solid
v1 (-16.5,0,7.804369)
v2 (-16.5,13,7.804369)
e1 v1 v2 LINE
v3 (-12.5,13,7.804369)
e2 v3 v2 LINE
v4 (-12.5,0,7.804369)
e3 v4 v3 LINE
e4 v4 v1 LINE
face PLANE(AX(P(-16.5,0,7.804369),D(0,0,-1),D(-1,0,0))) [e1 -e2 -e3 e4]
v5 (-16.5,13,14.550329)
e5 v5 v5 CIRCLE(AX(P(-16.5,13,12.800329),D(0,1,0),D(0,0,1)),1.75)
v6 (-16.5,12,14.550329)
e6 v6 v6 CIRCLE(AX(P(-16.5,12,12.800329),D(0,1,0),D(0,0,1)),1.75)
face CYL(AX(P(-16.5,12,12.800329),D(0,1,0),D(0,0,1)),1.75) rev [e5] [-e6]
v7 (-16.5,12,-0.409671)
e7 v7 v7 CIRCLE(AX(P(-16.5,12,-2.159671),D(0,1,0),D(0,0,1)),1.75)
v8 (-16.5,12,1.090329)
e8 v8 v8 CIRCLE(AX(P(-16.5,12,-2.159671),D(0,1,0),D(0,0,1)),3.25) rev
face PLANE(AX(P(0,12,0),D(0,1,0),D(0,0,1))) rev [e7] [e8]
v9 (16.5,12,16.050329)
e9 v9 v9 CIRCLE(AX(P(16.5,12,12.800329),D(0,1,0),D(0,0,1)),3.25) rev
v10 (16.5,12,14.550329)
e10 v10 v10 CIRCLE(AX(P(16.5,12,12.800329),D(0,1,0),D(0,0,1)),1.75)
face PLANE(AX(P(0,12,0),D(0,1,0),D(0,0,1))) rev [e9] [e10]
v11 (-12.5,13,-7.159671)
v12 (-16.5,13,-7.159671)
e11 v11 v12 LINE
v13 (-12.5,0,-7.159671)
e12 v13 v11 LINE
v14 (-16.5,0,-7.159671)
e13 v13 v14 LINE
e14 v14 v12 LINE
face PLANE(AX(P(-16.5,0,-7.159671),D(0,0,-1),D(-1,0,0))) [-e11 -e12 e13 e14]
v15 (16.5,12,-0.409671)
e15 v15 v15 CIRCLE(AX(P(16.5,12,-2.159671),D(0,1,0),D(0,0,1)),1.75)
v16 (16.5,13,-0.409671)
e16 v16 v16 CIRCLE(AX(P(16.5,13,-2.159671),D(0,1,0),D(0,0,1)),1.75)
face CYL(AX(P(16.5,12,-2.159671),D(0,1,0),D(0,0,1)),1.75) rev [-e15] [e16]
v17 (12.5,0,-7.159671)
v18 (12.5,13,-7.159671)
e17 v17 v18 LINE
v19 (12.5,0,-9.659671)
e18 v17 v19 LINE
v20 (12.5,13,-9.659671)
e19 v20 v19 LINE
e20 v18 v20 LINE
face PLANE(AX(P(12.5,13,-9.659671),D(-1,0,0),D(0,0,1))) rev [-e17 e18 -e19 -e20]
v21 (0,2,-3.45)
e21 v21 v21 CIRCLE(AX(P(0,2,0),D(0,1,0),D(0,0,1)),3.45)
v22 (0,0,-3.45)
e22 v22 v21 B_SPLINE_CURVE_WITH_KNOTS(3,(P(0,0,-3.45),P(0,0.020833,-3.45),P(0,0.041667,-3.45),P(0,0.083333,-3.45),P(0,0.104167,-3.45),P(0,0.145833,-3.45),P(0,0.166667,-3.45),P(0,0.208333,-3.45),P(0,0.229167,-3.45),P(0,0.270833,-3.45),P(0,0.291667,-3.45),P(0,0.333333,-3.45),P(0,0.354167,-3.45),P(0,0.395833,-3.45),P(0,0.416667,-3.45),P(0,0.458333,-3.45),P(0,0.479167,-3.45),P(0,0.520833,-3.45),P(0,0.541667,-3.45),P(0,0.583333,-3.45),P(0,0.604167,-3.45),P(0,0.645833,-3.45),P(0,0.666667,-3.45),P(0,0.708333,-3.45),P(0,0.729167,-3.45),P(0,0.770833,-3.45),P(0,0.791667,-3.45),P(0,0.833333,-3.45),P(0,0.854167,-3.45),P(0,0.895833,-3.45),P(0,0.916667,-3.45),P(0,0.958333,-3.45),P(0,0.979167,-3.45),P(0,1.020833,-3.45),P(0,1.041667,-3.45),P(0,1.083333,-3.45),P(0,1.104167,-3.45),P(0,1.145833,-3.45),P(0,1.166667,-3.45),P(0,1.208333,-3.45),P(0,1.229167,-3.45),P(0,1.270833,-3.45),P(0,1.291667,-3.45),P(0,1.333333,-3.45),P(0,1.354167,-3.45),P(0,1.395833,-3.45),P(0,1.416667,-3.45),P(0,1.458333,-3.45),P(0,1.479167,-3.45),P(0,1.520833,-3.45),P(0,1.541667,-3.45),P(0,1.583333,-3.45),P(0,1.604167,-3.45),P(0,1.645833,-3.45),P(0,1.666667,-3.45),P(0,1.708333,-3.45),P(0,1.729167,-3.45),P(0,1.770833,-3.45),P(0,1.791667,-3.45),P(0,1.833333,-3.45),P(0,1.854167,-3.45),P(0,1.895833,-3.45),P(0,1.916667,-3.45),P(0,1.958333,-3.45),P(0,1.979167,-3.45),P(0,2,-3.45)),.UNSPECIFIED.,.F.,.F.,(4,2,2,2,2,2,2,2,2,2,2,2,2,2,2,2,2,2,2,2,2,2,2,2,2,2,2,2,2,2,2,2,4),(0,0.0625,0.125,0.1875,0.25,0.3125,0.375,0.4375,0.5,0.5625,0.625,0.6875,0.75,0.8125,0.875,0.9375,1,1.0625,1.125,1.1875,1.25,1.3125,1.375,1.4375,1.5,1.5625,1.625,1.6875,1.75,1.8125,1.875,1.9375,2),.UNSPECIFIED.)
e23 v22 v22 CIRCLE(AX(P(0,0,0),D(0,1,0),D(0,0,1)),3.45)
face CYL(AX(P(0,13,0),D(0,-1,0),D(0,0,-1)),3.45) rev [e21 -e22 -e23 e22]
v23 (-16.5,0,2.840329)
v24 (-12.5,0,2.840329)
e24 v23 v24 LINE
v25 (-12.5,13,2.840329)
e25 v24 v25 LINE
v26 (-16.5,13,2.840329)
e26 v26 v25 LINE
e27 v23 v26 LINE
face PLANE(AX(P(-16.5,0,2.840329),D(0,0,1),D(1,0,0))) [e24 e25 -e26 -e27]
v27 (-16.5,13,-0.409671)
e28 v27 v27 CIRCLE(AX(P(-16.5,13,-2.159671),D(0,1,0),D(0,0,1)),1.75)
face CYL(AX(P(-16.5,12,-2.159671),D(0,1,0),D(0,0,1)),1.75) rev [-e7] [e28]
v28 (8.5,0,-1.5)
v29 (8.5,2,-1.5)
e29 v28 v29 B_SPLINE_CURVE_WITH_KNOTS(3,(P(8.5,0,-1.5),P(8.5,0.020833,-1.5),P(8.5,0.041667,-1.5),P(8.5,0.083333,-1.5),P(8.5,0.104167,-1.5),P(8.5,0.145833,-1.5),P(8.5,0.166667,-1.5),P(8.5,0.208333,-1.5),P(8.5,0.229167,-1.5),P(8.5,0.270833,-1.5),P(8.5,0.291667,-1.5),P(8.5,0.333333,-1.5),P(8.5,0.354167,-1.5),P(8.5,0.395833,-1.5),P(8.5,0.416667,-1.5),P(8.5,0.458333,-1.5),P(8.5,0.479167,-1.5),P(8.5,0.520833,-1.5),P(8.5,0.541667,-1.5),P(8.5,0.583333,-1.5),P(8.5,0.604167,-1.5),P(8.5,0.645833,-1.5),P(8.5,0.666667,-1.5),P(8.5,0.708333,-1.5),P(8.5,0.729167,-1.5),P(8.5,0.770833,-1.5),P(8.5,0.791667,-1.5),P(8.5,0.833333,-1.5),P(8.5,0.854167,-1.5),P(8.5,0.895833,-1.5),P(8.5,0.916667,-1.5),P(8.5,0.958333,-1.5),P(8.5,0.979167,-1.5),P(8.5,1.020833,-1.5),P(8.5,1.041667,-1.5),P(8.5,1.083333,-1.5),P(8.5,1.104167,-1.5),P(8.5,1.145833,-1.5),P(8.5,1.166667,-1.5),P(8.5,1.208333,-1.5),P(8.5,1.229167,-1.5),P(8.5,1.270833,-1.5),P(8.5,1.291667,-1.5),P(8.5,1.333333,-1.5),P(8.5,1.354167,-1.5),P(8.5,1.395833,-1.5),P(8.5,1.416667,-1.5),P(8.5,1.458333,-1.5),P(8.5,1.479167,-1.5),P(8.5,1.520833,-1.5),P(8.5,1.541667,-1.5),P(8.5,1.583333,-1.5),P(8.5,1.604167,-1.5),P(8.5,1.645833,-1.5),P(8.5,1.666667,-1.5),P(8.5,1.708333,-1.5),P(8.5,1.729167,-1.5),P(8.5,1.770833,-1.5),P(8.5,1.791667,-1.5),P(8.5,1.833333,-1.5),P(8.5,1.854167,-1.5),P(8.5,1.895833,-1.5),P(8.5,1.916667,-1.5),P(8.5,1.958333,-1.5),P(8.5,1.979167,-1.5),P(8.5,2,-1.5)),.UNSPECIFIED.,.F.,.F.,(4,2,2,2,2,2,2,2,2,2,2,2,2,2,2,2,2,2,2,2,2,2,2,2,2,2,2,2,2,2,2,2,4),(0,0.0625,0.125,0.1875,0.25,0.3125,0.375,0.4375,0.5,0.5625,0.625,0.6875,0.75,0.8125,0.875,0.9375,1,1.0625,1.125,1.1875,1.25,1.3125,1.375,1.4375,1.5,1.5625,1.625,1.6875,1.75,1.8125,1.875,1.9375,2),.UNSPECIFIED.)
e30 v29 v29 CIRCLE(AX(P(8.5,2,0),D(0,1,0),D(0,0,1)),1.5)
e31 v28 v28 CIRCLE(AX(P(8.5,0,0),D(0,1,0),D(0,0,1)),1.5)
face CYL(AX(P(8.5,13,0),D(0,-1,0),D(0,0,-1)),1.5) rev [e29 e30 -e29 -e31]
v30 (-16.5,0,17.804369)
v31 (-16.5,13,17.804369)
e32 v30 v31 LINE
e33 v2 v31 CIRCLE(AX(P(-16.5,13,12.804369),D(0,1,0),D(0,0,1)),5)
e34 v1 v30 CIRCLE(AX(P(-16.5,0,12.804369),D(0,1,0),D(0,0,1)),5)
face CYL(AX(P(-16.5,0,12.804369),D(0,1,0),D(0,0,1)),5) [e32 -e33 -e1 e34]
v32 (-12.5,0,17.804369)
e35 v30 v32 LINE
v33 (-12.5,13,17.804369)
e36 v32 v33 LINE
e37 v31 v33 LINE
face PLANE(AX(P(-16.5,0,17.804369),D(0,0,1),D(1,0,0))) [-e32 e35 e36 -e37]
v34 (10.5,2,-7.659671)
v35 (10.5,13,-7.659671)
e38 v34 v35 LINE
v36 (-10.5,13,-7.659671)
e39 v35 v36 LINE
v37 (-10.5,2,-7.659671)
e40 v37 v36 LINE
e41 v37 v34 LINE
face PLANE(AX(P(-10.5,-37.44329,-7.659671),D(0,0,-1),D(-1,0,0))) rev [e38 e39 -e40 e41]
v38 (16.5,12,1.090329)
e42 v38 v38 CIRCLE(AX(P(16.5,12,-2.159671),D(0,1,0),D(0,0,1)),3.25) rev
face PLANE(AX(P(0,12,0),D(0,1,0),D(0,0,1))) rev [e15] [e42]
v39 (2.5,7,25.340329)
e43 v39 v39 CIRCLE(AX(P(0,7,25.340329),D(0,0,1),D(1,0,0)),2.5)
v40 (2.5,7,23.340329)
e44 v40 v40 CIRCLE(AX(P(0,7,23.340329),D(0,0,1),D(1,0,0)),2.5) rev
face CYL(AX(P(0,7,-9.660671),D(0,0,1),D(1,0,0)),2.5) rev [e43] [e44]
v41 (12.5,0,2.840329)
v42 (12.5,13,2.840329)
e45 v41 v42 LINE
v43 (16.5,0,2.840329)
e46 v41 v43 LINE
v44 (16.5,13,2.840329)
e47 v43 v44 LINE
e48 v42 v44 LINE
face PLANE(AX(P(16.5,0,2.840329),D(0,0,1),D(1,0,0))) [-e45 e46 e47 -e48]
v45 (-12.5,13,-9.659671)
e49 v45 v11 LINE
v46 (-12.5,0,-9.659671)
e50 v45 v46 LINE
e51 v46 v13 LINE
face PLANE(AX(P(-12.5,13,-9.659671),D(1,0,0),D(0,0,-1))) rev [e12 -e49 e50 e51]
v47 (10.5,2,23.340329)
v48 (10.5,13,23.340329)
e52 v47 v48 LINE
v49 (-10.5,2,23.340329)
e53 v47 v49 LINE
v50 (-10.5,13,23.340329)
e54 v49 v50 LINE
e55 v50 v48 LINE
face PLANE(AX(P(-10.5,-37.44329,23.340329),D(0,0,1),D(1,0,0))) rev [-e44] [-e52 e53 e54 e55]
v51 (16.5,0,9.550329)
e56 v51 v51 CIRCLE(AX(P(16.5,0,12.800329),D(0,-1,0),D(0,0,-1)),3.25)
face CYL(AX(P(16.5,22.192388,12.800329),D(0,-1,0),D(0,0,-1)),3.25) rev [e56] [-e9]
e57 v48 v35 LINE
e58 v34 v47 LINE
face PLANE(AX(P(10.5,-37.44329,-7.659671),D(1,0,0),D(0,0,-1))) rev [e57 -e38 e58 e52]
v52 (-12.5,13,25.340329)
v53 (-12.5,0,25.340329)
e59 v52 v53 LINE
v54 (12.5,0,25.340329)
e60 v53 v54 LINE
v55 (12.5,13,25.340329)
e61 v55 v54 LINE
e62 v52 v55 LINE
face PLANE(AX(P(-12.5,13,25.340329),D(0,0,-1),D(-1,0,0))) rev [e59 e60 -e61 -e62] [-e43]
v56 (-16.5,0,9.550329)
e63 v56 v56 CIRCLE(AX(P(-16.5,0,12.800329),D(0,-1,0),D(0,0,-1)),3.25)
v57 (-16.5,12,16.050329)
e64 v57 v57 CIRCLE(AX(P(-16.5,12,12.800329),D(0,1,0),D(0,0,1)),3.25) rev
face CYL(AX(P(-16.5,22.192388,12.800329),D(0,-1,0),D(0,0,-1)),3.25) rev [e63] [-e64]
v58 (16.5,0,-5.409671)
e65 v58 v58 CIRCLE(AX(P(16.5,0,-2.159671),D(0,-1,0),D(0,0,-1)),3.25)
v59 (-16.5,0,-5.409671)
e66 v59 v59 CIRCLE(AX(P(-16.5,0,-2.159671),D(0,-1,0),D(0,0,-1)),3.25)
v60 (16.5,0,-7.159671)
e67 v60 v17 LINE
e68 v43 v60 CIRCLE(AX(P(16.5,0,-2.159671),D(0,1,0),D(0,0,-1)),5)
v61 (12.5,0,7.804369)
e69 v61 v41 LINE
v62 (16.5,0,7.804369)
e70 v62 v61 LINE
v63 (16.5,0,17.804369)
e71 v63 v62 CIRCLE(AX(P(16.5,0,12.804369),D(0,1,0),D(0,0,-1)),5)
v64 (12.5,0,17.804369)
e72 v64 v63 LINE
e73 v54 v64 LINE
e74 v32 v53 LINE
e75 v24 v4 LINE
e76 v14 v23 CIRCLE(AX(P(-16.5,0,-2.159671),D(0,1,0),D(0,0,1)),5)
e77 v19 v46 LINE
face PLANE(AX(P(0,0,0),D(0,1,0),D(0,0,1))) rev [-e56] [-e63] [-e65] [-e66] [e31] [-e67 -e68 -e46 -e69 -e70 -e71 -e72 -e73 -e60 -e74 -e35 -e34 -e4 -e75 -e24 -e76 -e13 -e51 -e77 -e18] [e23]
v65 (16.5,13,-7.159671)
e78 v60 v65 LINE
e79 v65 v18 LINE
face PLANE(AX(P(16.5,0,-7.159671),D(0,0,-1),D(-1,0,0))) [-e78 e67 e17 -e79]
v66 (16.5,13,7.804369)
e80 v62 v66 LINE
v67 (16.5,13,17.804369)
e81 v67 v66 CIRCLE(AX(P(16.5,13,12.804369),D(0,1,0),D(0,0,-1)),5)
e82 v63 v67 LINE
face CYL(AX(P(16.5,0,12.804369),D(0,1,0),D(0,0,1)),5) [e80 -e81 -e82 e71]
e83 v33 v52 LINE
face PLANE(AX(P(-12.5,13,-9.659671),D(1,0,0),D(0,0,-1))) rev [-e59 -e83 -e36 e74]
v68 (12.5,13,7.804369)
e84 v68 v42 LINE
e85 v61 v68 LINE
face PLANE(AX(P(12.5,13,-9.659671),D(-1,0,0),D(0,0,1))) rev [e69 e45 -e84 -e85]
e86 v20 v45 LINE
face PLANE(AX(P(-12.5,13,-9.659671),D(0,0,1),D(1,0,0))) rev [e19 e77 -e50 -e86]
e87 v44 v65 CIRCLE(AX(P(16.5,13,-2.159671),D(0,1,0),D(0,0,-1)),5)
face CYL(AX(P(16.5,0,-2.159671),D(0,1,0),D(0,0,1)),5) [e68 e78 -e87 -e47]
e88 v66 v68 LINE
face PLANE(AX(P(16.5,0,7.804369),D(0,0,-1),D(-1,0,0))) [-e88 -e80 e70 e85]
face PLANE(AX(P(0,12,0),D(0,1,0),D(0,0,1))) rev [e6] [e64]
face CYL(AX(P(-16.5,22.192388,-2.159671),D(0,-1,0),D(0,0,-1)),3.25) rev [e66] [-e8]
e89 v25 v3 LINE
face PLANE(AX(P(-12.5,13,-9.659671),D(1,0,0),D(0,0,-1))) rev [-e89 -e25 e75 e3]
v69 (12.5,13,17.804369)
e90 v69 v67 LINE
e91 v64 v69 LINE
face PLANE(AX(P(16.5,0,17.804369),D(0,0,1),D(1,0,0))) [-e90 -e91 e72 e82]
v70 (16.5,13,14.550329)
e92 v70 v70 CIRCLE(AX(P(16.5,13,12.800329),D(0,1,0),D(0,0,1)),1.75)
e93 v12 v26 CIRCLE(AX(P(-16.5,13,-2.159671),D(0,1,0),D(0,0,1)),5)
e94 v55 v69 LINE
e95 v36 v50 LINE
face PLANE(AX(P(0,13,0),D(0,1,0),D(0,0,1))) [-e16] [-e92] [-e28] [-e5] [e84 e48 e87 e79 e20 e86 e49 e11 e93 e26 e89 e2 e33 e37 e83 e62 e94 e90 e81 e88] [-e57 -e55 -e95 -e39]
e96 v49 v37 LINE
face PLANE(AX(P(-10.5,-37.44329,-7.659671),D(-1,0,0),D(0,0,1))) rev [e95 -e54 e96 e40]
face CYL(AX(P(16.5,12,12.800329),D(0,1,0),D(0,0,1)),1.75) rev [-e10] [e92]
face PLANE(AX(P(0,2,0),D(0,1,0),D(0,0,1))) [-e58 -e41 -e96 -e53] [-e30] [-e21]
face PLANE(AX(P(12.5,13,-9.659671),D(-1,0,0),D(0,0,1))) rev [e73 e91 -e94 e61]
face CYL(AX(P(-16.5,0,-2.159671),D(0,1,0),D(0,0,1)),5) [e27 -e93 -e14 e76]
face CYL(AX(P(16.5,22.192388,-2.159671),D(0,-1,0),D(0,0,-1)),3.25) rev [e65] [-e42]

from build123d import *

# Parameters (mm, degrees)
SKETCH1_W              = 25
SKETCH1_H              = 35
SKETCH1_R              = 3.45
SKETCH1_R_2            = 1.5
BOSS_EXTRUDE1_DEPTH    = 13
SKETCH5_W              = 21
SKETCH5_H              = 31
CUT_EXTRUDE1_DEPTH     = 11
CUT_EXTRUDE2_REACH     = 41.373
SKETCH7_R              = 2.5
BOSS_EXTRUDE3_DEPTH    = 13
SKETCH11_R             = 3.25
CUT_EXTRUDE4_DEPTH     = 12
CUT_EXTRUDE5_START     = 12
CUT_EXTRUDE5_OUTLINE_R = 1.75
CUT_EXTRUDE5_DEPTH     = 1


# Read off the part's stored shape, not the designer's step: Cut-Extrude5
with BuildPart() as part:
    # Sketch1 → Boss-Extrude1 (new body)
    with BuildSketch(Plane(origin=(0, 0, 0), x_dir=(1, 0, 0), z_dir=(0, 1, 0))):
        with Locations((0, -7.840328725)):
            Rectangle(SKETCH1_W, SKETCH1_H)
        with Locations(Location((0, 0, 0), (0, 0, 90))):
            Circle(SKETCH1_R, mode=Mode.SUBTRACT)
        with Locations(Location((8.5, 0, 0), (0, 0, 90))):
            Circle(SKETCH1_R_2, mode=Mode.SUBTRACT)
    extrude(amount=BOSS_EXTRUDE1_DEPTH)

    # Sketch5 → Cut-Extrude1 (cut)
    with BuildSketch(Plane(origin=(0, 13, 0), x_dir=(1, 0, 0), z_dir=(0, 1, 0))):
        with Locations((0, -7.840328725)):
            Rectangle(SKETCH5_W, SKETCH5_H)
    extrude(amount=-CUT_EXTRUDE1_DEPTH, mode=Mode.SUBTRACT)

    # Sketch7 → Cut-Extrude2 (cut, up to next)
    with BuildSketch(Plane.XY.offset(25.340328725), mode=Mode.PRIVATE) as cut_extrude2_sk1:
        with Locations((0, 7)):
            Circle(SKETCH7_R)
    cut_extrude2_tool1 = extrude(cut_extrude2_sk1.sketch, amount=-CUT_EXTRUDE2_REACH, mode=Mode.PRIVATE) & part.part
    add(cut_extrude2_tool1.solids().sort_by_distance((0, 7, 25.340329))[0], mode=Mode.SUBTRACT)

    # Sketch9 → Boss-Extrude3 (add, through all)
    with BuildSketch(Plane(origin=(0, 13, 0), x_dir=(1, 0, 0), z_dir=(0, 1, 0))):
        with BuildLine():
            Line((-16.5, 7.159671275), (-12.5, 7.159671275))
            Line((-12.5, 7.159671275), (-12.5, -2.840328725))
            Line((-12.5, -2.840328725), (-16.5, -2.840328725))
            ThreePointArc((-16.5, -2.840328725), (-21.5, 2.159671275), (-16.5, 7.159671275))
        make_face()
        with BuildLine():
            Line((-16.5, -7.804369497), (-12.5, -7.804369497))
            Line((-12.5, -7.804369497), (-12.5, -17.804369497))
            Line((-12.5, -17.804369497), (-16.5, -17.804369497))
            ThreePointArc((-16.5, -17.804369497), (-21.5, -12.804369497), (-16.5, -7.804369497))
        make_face()
        with BuildLine():
            Line((12.5, -7.804369497), (12.5, -17.804369497))
            Line((12.5, -17.804369497), (16.5, -17.804369497))
            ThreePointArc((16.5, -17.804369497), (21.5, -12.804369497), (16.5, -7.804369497))
            Line((16.5, -7.804369497), (12.5, -7.804369497))
        make_face()
        with BuildLine():
            Line((12.5, 7.159671275), (12.5, -2.840328725))
            Line((12.5, -2.840328725), (16.5, -2.840328725))
            ThreePointArc((16.5, -2.840328725), (21.5, 2.159671275), (16.5, 7.159671275))
            Line((16.5, 7.159671275), (12.5, 7.159671275))
        make_face()
    extrude(amount=-BOSS_EXTRUDE3_DEPTH)

    # Sketch11 → Cut-Extrude4 (cut)
    with BuildSketch(Plane.XZ):
        with Locations(Location((-16.5, 12.800328725, 0), (0, 0, 270))):
            Circle(SKETCH11_R)
        with Locations(Location((-16.5, -2.159671275, 0), (0, 0, 270))):
            Circle(SKETCH11_R)
        with Locations(Location((16.5, 12.800328725, 0), (0, 0, 270))):
            Circle(SKETCH11_R)
        with Locations(Location((16.5, -2.159671275, 0), (0, 0, 270))):
            Circle(SKETCH11_R)
    extrude(amount=-CUT_EXTRUDE4_DEPTH, mode=Mode.SUBTRACT)

    # Cut-Extrude5 outline → Cut-Extrude5 (cut)
    with BuildSketch(Plane(origin=(0, 0, 0), x_dir=(1, 0, 0), z_dir=(0, 1, 0)).offset(CUT_EXTRUDE5_START)):
        with Locations((-16.5, 2.159671275)):
            Circle(CUT_EXTRUDE5_OUTLINE_R)
        with Locations((16.5, -12.800328725)):
            Circle(CUT_EXTRUDE5_OUTLINE_R)
        with Locations((16.5, 2.159671275)):
            Circle(CUT_EXTRUDE5_OUTLINE_R)
        with Locations((-16.5, -12.800328725)):
            Circle(CUT_EXTRUDE5_OUTLINE_R)
    extrude(amount=CUT_EXTRUDE5_DEPTH, mode=Mode.SUBTRACT)


solid = part.part
